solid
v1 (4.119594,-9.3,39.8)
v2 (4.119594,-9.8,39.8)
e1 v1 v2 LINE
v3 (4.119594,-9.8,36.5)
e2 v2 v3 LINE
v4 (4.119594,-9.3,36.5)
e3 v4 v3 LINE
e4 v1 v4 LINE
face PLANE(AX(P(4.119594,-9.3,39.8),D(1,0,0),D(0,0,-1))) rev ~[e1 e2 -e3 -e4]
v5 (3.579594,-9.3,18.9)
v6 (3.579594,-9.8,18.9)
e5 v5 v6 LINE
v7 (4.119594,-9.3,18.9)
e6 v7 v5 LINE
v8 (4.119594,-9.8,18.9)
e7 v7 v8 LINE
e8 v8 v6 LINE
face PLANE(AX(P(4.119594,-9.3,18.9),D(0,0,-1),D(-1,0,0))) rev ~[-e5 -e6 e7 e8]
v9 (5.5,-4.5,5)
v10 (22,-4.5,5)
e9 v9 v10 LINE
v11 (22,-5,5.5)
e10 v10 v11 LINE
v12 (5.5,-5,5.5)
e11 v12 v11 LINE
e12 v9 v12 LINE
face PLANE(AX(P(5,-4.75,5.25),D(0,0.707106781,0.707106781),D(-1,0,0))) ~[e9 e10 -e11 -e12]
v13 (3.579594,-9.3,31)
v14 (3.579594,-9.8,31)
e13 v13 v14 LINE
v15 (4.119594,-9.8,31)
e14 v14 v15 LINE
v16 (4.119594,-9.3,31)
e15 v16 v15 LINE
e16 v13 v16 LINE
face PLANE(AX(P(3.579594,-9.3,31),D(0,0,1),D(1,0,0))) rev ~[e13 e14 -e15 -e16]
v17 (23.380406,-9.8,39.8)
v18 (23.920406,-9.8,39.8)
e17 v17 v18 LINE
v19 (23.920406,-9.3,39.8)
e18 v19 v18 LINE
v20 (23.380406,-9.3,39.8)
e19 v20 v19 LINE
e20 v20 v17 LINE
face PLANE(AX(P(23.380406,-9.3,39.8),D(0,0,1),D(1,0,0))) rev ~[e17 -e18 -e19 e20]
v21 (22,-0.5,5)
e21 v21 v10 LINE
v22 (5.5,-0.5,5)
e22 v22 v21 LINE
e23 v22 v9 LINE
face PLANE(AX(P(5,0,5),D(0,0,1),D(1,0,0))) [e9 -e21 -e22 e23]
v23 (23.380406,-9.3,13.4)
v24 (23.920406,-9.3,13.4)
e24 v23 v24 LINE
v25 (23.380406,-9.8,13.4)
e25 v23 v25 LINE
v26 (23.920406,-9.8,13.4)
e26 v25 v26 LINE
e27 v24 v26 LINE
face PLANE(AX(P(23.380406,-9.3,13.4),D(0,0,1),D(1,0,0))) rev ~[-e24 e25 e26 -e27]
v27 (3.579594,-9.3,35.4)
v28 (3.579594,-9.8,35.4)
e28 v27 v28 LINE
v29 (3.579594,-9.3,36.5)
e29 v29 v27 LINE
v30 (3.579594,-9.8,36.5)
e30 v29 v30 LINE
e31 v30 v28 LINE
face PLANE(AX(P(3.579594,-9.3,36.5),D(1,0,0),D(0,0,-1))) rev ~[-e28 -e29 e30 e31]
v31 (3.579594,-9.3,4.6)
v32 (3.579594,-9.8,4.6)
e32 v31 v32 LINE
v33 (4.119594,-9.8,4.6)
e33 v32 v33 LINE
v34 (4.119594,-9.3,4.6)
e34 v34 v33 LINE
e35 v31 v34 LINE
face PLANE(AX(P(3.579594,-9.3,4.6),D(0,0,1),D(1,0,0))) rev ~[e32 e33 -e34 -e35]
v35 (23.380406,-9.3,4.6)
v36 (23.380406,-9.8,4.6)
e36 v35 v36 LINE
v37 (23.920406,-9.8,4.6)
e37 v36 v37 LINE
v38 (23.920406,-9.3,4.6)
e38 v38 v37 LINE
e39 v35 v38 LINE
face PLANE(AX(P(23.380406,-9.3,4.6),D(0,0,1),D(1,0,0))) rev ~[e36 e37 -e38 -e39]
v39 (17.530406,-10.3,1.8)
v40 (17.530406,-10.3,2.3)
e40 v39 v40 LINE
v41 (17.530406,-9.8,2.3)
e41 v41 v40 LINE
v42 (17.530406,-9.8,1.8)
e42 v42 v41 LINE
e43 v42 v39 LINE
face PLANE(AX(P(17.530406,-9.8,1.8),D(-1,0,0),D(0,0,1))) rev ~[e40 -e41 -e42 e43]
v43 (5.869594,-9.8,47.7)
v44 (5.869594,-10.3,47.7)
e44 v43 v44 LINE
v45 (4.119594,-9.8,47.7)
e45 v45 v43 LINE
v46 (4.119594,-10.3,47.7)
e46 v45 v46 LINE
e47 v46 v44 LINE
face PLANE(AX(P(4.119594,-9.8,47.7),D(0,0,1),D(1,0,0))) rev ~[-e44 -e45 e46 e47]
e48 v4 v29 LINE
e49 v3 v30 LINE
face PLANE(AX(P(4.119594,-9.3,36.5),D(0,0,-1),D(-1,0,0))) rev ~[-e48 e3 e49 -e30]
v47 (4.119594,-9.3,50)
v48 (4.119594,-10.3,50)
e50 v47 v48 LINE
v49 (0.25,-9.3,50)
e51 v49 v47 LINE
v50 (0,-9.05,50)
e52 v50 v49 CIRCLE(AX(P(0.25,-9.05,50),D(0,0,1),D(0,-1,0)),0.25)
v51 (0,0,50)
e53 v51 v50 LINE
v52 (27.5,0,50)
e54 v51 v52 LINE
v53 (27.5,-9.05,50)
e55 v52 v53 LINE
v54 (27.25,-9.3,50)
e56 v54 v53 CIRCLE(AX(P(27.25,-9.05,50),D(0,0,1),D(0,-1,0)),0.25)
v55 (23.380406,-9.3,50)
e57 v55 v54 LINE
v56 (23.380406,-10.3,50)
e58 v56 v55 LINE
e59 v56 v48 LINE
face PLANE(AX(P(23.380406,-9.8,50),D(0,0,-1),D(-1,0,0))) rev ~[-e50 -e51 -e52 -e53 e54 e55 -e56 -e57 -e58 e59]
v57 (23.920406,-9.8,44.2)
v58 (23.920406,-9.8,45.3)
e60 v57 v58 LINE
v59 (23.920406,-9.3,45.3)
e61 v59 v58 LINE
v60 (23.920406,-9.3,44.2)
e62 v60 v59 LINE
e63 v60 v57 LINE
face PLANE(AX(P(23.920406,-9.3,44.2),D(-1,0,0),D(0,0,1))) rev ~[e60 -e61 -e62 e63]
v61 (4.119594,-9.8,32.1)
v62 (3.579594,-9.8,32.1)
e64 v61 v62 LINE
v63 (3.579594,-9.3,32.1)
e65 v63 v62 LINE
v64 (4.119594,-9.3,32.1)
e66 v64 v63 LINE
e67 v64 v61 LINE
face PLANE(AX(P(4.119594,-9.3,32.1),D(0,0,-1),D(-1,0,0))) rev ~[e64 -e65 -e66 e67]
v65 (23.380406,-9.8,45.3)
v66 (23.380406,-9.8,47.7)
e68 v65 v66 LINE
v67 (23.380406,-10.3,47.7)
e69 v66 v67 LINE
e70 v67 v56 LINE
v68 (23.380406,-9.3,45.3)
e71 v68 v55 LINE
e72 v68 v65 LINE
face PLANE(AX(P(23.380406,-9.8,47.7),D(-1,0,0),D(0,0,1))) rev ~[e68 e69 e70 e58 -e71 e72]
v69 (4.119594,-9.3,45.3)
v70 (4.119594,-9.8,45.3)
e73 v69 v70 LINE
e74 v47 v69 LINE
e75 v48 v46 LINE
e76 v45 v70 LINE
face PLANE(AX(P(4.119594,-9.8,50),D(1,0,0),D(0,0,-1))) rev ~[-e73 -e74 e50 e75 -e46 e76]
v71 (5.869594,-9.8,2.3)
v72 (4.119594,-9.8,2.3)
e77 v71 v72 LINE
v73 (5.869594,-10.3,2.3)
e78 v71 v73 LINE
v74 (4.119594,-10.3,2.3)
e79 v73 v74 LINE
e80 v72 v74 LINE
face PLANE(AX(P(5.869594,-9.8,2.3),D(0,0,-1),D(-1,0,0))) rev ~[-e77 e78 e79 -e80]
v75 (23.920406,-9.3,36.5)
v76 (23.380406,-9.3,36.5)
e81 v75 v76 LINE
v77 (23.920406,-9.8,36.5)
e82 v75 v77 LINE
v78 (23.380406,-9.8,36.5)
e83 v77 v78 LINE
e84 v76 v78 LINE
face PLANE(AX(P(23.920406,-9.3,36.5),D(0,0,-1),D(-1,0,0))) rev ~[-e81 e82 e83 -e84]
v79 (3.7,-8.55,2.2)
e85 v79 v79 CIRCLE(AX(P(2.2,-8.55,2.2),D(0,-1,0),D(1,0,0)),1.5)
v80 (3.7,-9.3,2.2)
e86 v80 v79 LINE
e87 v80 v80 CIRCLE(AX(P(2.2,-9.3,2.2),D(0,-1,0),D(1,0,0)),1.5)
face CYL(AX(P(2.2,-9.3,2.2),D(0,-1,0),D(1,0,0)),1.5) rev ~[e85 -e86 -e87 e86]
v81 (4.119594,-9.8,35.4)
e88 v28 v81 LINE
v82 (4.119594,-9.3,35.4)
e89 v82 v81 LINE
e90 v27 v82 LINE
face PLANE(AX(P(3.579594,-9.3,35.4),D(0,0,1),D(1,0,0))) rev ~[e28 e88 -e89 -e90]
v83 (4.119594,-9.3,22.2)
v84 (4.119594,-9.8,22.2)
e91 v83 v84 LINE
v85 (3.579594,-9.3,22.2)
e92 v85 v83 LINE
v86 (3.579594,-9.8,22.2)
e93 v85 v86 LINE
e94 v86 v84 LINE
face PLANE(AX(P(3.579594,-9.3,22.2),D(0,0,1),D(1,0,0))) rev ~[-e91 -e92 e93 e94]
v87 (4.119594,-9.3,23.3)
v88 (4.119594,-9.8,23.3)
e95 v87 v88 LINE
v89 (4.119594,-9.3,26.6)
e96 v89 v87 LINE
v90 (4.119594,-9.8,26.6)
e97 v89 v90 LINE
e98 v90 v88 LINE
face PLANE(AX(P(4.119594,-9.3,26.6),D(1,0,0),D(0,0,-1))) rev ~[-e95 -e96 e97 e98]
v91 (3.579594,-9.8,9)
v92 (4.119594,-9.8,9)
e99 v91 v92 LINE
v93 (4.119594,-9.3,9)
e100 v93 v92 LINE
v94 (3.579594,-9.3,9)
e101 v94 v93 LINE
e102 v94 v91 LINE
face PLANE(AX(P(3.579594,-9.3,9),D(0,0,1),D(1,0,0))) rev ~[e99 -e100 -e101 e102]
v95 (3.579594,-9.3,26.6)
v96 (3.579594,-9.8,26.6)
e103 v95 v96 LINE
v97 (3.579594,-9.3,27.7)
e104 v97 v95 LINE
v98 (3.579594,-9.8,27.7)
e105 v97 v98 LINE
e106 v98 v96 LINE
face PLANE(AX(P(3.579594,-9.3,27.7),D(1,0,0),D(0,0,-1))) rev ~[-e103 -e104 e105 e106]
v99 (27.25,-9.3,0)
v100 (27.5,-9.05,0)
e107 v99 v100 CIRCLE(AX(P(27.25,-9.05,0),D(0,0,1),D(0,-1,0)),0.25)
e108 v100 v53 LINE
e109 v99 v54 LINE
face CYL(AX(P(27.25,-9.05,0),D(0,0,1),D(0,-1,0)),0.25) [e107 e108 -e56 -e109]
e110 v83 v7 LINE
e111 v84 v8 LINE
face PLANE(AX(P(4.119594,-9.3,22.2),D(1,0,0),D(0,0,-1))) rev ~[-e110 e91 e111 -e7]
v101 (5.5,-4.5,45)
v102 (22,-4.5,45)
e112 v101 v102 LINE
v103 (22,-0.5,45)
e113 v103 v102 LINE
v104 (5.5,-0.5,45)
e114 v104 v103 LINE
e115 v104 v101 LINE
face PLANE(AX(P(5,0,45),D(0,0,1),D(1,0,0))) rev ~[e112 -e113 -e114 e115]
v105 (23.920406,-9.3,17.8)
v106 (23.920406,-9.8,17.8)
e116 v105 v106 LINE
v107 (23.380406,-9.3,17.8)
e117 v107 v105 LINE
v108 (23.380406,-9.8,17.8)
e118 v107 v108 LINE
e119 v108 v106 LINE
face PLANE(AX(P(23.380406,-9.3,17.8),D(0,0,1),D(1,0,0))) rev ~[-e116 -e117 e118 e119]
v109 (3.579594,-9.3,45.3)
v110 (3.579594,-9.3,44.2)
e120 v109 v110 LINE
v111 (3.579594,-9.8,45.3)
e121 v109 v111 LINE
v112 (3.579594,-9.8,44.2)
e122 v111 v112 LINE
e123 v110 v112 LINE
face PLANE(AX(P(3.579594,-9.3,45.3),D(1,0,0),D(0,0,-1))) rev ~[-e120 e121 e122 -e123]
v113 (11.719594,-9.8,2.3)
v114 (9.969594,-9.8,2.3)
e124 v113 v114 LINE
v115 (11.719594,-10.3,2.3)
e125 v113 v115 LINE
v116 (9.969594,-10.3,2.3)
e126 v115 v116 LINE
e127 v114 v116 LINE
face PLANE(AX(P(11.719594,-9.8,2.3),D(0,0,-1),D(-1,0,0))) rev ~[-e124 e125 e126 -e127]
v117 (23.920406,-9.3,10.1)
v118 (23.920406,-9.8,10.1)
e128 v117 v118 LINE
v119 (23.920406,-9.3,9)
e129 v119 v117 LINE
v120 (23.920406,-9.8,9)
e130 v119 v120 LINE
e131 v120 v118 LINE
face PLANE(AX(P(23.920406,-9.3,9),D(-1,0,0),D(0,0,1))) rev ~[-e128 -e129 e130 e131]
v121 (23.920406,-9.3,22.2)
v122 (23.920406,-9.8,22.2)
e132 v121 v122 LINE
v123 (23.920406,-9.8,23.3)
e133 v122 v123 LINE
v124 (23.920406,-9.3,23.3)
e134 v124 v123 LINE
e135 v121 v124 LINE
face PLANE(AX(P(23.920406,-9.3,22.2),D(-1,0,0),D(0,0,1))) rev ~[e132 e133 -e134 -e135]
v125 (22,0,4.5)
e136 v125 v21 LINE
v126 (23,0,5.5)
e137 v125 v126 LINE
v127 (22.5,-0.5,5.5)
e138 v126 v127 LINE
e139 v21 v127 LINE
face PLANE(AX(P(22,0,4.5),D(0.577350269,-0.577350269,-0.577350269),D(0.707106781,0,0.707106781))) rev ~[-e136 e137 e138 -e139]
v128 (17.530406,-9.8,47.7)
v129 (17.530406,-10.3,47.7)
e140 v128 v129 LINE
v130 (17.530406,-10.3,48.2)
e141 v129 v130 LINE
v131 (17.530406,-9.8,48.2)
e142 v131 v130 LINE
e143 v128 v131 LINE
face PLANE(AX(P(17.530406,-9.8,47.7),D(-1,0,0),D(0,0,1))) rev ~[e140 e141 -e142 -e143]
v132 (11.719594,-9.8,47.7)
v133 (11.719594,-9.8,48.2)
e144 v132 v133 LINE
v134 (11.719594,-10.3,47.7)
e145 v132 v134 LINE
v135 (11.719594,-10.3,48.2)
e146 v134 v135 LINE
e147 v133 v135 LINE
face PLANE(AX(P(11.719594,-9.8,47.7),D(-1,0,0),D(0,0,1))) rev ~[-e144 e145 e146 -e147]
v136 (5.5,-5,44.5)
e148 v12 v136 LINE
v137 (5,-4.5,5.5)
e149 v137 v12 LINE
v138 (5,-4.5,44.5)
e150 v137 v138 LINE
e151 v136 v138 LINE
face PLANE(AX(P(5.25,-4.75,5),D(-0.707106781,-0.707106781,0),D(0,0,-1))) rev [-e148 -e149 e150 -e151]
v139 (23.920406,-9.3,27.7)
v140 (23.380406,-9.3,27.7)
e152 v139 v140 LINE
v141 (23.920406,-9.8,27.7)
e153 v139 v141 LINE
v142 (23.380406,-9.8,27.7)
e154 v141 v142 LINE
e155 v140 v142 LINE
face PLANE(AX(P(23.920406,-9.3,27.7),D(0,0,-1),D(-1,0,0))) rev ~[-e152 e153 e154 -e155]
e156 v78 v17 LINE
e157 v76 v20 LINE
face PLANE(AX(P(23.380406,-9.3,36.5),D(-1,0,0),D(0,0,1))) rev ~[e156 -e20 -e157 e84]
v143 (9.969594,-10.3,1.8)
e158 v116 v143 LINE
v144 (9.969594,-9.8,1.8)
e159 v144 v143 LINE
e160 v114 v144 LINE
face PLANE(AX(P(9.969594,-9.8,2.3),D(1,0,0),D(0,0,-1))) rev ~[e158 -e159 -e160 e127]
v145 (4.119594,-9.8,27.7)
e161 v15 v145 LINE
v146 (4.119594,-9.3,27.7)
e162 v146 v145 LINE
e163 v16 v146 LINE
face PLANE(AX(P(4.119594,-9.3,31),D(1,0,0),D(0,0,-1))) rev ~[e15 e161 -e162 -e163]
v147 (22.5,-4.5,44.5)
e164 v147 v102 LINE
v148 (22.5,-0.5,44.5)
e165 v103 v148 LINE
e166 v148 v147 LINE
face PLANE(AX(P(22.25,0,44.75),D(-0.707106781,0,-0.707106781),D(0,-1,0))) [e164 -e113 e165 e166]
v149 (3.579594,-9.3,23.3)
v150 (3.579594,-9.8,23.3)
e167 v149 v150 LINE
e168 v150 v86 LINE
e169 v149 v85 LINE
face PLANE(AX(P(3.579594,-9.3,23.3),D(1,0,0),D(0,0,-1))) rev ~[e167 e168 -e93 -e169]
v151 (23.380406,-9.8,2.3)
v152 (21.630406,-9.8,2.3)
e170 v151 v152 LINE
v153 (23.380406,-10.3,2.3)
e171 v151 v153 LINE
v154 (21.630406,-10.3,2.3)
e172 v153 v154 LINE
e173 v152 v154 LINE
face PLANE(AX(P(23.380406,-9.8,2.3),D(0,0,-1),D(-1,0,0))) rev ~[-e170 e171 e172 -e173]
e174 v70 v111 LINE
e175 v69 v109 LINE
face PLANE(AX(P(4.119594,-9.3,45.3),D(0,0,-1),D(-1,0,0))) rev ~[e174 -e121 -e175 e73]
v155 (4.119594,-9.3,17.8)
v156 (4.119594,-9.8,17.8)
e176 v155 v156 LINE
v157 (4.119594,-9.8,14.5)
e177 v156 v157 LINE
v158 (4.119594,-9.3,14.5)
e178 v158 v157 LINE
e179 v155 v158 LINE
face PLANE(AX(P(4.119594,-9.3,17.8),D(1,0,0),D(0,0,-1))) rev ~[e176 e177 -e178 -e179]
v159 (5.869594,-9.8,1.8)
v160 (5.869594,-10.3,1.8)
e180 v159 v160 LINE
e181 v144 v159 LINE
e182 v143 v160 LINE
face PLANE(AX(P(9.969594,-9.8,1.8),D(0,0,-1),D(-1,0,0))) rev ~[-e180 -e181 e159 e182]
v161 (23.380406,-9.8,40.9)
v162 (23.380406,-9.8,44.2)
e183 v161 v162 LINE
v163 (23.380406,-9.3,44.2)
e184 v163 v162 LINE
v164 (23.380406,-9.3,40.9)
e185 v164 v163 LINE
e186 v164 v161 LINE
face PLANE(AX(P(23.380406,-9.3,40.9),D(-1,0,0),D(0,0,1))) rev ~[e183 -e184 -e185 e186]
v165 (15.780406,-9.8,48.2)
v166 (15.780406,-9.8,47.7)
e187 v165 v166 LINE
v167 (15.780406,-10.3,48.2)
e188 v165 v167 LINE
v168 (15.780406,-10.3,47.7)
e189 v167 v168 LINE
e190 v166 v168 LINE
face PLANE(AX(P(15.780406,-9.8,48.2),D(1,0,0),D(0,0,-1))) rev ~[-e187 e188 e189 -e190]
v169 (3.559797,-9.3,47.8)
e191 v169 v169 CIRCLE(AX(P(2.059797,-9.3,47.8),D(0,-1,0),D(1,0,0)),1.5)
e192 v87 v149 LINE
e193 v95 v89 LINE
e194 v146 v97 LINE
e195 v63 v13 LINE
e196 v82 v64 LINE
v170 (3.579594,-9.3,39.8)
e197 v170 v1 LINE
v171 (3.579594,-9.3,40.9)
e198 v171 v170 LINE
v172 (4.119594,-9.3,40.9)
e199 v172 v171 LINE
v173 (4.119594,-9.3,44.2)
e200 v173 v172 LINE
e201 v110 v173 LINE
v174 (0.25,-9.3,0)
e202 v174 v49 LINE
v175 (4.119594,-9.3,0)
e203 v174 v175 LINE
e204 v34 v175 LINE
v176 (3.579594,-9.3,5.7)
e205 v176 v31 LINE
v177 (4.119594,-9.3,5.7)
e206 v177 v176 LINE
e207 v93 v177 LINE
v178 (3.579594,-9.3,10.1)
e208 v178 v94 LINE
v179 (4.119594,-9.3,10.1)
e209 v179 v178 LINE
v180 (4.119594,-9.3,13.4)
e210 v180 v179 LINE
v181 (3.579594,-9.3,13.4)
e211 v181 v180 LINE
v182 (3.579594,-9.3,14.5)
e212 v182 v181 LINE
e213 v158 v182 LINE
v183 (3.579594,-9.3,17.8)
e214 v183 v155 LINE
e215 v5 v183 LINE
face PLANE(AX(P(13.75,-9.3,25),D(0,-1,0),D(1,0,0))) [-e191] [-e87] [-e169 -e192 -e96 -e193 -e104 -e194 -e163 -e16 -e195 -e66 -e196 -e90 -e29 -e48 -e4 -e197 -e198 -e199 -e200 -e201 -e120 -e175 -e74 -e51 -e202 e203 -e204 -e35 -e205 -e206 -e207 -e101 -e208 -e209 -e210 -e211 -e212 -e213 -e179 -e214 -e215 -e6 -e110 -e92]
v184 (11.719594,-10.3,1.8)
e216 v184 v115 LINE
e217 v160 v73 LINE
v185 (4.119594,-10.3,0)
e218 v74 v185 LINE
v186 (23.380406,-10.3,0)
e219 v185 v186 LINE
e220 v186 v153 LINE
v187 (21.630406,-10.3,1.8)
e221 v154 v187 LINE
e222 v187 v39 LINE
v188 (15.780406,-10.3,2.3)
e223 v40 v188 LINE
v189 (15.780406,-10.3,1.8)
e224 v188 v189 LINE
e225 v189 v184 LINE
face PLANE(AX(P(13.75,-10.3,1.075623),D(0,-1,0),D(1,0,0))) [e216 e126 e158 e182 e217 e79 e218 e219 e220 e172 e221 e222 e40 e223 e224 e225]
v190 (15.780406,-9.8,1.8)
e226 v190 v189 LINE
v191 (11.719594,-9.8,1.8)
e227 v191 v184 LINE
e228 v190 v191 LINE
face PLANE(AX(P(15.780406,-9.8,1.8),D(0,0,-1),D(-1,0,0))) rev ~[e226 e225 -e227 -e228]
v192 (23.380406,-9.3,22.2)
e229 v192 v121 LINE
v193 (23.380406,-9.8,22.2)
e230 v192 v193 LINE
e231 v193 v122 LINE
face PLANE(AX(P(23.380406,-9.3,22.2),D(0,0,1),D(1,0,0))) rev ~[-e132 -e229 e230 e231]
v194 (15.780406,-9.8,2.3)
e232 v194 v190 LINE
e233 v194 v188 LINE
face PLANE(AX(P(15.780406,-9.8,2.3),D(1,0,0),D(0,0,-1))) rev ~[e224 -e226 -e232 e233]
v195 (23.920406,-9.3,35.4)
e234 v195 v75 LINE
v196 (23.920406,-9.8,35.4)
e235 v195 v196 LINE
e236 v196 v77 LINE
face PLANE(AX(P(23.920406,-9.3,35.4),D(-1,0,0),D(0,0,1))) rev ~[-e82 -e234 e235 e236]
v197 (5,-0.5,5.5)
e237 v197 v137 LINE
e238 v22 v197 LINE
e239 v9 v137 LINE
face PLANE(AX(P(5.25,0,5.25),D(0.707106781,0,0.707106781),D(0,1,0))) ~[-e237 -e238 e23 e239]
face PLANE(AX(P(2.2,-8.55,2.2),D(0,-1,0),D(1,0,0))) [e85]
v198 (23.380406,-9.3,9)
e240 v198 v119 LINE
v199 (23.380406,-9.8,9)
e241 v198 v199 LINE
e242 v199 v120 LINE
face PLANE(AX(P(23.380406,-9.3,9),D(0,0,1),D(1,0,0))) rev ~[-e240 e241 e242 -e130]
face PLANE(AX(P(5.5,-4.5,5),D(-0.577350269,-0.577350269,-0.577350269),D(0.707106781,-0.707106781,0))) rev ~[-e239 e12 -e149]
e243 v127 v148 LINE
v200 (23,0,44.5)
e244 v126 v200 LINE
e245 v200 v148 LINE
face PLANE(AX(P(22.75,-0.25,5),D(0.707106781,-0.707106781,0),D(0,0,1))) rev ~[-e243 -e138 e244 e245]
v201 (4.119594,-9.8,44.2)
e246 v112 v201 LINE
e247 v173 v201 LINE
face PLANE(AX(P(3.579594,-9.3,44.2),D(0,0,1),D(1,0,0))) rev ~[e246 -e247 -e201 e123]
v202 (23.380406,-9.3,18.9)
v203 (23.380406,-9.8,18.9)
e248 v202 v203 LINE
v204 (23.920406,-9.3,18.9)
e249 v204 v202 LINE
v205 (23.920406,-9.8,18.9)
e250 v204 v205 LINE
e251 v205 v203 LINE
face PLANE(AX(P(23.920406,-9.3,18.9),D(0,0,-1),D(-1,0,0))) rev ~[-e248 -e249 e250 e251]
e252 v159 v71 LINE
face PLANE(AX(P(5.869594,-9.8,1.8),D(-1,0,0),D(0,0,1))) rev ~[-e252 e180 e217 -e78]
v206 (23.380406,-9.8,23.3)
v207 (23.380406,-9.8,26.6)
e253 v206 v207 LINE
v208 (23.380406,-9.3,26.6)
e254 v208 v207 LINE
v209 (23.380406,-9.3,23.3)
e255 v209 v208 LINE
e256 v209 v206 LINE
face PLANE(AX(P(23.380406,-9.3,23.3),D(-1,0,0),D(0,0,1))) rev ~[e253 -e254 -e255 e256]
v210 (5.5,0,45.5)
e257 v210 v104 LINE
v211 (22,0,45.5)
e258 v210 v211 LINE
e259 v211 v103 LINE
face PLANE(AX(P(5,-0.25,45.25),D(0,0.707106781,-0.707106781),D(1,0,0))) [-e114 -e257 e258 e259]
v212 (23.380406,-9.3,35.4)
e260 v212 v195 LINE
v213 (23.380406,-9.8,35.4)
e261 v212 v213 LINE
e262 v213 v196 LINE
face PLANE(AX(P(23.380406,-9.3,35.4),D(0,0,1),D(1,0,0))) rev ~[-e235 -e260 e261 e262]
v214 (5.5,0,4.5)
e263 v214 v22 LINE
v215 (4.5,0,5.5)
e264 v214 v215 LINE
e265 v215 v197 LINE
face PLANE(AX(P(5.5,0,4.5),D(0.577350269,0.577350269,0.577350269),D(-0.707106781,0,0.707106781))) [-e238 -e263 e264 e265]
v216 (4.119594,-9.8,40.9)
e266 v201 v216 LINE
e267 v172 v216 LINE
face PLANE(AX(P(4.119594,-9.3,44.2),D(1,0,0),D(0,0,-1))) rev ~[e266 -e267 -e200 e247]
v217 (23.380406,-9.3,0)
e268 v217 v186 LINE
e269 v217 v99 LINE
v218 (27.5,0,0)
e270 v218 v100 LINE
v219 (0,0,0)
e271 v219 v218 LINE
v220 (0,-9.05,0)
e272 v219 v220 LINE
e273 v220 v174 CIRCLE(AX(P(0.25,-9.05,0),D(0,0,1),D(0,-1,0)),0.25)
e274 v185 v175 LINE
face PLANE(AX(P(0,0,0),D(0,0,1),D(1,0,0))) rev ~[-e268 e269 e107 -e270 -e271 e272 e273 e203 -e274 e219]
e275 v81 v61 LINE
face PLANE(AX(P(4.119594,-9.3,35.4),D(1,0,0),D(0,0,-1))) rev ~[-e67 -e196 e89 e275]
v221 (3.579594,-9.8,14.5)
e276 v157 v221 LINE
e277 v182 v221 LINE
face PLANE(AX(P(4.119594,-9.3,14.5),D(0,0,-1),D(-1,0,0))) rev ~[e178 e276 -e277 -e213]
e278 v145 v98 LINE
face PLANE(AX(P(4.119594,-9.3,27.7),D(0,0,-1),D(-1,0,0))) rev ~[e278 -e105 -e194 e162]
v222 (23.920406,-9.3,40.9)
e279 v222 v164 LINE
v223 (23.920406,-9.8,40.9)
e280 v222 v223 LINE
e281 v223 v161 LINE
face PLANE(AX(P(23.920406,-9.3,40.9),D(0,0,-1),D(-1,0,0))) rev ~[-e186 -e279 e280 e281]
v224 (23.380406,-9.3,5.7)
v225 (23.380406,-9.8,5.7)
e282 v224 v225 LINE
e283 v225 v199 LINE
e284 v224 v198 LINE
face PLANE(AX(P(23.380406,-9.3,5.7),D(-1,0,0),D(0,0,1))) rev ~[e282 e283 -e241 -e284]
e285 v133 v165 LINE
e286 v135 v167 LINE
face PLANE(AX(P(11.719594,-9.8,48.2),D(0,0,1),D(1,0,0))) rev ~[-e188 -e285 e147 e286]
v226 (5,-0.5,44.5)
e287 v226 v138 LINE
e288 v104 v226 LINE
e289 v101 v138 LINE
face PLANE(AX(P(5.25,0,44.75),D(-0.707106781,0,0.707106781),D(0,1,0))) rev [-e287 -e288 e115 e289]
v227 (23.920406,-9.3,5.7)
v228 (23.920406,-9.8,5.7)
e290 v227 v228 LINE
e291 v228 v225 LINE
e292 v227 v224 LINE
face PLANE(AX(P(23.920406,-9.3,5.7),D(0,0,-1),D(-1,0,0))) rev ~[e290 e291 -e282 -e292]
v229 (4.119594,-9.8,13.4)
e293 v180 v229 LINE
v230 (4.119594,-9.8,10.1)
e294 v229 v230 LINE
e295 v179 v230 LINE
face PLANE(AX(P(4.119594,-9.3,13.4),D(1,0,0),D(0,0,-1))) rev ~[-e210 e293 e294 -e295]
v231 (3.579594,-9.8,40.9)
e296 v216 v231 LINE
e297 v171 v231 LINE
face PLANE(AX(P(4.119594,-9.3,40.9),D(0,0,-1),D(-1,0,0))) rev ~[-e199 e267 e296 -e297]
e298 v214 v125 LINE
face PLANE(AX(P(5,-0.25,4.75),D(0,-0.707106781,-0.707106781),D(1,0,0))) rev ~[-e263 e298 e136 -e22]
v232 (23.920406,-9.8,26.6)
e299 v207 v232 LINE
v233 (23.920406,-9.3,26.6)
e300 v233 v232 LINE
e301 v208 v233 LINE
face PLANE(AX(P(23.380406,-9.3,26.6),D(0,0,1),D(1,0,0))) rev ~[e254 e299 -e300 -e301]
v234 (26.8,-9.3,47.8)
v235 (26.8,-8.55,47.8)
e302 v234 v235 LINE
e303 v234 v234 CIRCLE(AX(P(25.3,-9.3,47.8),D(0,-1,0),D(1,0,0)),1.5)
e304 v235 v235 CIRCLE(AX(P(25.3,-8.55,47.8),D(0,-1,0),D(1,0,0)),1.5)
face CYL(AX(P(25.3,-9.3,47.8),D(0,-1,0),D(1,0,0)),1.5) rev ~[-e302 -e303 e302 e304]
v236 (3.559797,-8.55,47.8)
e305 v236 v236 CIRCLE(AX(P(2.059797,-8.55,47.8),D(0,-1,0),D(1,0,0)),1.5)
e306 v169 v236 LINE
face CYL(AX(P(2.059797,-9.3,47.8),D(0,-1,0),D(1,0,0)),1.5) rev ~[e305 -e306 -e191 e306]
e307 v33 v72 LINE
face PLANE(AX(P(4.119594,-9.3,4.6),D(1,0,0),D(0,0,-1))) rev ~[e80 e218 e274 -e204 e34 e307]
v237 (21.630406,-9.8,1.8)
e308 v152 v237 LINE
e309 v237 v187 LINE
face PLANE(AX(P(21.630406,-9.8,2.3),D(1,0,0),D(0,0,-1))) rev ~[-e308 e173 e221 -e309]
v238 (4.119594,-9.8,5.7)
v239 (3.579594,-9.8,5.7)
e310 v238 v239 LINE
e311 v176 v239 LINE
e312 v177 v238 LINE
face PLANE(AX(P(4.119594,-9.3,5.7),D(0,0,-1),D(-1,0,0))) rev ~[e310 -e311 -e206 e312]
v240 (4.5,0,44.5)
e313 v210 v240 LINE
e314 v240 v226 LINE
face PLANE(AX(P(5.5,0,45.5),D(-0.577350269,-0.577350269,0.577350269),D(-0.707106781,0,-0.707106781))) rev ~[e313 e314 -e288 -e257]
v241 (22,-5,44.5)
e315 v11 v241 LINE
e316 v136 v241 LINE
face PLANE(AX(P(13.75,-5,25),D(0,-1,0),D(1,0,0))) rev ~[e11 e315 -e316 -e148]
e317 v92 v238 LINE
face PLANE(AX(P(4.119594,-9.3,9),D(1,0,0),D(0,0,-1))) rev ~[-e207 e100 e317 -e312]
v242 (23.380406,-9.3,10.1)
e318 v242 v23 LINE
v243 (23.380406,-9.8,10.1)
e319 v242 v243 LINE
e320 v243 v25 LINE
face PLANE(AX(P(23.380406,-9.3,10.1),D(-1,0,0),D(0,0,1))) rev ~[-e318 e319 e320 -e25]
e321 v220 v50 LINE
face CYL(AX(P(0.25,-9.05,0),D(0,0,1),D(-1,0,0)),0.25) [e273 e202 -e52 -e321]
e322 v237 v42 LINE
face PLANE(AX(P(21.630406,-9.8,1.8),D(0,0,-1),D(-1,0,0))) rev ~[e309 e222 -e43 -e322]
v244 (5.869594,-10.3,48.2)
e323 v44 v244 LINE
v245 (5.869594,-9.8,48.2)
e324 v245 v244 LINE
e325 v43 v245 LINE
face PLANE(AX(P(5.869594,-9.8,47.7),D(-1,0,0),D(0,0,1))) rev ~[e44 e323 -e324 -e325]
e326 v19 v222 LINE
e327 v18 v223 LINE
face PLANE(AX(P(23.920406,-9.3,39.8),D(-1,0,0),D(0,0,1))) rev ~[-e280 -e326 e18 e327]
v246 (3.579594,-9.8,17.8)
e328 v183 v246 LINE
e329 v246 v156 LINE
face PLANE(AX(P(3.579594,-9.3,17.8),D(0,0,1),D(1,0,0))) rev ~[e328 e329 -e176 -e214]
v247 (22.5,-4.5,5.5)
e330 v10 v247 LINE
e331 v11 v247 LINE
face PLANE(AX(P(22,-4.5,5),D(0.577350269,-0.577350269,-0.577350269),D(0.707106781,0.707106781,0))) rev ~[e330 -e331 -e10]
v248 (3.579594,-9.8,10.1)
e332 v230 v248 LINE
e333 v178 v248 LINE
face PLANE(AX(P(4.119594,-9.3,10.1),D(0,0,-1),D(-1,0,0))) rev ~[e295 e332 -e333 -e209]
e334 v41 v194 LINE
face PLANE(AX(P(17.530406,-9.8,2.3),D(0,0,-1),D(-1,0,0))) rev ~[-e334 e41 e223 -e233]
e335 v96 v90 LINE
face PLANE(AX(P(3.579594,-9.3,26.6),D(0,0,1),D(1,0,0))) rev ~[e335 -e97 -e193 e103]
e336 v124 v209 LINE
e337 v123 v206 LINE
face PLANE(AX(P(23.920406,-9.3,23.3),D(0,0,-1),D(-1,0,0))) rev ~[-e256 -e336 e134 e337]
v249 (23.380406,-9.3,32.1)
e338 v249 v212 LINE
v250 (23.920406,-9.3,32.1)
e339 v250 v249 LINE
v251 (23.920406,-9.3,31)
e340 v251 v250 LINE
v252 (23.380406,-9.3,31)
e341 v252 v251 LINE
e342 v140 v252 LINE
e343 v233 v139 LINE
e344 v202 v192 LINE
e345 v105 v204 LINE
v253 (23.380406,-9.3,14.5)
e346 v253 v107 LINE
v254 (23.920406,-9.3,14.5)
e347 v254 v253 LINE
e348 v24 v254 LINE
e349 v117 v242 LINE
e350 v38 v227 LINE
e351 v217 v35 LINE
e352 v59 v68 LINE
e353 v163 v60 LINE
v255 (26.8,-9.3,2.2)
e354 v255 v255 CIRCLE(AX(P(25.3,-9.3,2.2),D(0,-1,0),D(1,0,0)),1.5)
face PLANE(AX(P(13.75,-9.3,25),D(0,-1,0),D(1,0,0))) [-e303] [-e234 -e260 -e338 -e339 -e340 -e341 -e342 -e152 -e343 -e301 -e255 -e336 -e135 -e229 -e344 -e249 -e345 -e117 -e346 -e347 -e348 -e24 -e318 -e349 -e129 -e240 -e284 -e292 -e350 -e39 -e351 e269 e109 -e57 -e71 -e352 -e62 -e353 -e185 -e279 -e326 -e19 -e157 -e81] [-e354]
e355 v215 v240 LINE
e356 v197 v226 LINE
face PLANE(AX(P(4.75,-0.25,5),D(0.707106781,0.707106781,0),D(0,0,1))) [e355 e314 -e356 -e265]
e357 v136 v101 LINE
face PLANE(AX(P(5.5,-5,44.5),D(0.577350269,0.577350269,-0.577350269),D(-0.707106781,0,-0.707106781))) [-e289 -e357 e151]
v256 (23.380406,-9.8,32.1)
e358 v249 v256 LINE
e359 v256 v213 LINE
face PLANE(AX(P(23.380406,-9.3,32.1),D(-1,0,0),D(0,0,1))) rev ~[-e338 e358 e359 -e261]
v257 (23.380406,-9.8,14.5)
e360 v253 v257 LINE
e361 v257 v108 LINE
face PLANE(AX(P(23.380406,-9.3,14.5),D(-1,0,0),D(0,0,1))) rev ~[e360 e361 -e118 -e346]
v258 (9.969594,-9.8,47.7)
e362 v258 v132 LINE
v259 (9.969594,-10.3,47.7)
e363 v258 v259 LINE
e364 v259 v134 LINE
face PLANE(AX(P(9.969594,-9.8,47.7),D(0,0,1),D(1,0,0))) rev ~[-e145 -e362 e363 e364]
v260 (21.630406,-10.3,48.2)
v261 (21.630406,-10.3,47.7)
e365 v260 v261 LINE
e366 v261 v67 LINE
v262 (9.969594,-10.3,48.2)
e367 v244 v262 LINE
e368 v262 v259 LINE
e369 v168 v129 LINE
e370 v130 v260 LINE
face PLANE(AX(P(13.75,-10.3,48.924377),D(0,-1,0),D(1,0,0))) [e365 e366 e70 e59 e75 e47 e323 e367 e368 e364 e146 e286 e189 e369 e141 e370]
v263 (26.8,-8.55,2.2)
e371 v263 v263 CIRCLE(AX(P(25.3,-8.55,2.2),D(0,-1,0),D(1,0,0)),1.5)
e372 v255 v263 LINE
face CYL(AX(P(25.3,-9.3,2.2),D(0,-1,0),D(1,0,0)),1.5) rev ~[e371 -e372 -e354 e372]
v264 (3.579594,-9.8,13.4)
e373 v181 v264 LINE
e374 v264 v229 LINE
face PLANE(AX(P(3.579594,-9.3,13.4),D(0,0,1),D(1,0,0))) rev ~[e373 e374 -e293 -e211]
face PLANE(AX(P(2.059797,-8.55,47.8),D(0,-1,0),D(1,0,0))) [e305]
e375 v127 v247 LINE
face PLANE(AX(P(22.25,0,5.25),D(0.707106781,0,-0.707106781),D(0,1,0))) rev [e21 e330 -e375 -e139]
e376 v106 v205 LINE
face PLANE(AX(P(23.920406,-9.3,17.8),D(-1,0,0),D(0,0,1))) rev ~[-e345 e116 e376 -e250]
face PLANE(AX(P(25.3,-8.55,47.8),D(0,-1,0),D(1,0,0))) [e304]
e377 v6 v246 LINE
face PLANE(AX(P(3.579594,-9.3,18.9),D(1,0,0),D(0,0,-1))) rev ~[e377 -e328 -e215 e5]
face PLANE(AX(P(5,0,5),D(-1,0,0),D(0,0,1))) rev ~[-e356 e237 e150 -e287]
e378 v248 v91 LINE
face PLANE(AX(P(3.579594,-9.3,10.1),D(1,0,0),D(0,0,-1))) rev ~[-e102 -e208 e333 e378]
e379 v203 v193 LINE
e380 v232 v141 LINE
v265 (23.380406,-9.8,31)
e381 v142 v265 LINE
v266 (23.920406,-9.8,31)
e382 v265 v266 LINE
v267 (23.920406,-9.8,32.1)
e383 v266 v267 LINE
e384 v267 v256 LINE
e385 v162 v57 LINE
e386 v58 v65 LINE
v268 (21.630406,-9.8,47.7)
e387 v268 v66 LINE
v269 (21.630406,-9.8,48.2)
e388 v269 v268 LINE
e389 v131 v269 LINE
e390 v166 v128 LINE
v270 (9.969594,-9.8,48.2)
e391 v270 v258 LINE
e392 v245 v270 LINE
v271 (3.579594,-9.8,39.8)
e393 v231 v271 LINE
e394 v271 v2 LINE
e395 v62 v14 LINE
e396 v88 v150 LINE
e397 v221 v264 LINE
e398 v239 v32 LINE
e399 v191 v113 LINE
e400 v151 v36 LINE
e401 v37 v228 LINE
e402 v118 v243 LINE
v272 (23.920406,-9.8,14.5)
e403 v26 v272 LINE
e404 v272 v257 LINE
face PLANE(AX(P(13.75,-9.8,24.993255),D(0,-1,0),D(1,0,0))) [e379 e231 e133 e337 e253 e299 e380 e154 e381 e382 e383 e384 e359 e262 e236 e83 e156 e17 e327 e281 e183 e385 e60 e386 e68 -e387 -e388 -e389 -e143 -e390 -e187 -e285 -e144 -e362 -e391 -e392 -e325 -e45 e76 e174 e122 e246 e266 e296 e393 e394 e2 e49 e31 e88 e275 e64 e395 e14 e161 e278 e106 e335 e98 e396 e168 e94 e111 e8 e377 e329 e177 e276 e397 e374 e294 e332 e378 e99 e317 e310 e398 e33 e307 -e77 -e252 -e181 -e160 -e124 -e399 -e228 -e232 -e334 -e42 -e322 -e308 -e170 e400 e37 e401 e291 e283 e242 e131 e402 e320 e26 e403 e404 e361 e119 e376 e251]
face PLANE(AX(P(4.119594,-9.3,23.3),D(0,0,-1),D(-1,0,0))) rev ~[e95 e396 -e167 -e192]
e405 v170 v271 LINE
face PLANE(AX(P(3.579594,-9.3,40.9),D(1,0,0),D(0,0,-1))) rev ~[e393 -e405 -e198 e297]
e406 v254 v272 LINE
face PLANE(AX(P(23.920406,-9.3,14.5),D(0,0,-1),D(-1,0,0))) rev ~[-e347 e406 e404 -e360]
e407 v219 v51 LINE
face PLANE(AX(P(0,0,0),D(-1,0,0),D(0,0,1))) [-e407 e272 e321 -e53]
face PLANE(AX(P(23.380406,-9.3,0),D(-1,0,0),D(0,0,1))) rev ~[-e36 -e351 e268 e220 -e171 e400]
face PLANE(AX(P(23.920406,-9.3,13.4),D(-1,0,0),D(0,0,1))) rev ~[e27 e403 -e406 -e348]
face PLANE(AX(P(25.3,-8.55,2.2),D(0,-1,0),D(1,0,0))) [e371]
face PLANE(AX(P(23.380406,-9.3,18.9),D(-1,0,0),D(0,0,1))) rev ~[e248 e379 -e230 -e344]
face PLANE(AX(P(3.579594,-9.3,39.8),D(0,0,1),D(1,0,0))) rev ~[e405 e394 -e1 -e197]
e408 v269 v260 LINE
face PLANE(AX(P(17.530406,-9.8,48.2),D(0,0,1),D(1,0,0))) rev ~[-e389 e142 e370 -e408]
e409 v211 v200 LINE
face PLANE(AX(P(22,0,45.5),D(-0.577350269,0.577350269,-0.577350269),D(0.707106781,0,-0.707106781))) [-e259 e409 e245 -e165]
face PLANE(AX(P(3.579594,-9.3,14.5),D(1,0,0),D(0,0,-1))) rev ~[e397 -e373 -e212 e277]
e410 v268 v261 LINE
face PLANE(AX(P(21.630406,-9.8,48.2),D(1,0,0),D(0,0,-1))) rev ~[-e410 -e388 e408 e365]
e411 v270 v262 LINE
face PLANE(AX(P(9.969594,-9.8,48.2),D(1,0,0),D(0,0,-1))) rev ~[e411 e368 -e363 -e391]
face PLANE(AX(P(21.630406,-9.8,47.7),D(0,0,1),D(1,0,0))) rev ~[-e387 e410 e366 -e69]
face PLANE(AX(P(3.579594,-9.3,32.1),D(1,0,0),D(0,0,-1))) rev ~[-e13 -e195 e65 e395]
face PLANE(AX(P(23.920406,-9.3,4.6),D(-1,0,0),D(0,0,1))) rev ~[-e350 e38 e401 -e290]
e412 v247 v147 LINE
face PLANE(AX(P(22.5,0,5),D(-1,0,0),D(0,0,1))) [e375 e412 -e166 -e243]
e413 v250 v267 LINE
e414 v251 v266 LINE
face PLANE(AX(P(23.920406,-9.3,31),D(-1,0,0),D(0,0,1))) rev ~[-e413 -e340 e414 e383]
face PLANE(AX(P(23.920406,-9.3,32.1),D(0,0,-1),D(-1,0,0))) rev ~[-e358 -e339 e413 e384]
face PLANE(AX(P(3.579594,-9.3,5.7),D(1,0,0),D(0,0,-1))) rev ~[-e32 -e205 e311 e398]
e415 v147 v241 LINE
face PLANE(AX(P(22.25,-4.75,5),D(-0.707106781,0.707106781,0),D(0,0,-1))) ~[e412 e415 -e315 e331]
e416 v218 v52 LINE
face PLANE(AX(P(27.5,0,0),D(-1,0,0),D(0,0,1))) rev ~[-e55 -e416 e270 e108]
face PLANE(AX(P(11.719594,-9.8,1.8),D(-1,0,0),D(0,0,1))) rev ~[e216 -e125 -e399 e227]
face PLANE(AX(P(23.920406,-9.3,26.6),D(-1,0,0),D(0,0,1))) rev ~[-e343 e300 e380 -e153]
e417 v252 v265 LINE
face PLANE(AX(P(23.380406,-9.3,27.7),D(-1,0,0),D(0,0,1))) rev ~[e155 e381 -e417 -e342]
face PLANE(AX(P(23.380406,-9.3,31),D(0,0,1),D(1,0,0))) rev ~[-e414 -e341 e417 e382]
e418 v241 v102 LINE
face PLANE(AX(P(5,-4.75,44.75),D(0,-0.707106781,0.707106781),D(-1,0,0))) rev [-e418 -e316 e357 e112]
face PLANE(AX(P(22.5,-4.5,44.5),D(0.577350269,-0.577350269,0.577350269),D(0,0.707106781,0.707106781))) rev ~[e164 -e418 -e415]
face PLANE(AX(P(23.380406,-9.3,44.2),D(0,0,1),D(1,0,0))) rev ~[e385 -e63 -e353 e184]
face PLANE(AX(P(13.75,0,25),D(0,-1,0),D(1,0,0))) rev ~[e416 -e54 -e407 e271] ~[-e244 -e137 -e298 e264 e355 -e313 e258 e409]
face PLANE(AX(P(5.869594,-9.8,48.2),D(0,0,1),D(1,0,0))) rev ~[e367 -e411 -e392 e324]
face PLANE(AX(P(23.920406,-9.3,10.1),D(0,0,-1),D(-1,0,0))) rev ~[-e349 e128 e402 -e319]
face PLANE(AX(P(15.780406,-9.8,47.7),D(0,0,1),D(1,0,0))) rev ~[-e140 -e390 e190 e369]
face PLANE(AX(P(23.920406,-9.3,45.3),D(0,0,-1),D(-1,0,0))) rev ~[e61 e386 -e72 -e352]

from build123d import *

# Parameters (mm, degrees)
F0_W      = 27.5
F0_H      = 50
F1_DEPTH  = 9.3
F3_DEPTH  = 0.5
F4_R      = 1.5
F5_DEPTH  = 0.75
F6_R      = 0.25
F8_DEPTH  = 0.5
F9_W      = 17.5
F9_H      = 40
F10_DEPTH = 5
F11_SIZE  = 0.5


with BuildPart() as f1:
    # F0 (on Front) → F1 (new body)
    with BuildSketch(Plane.XZ):
        with Locations((13.75, 25)):
            Rectangle(F0_W, F0_H)
    extrude(amount=F1_DEPTH)

    # F2 (on face) → F3 (join)
    with BuildSketch(Plane.XZ.offset(9.3)):
        Polygon((13.75, 50), (4.1195944277, 50), (4.1195944277, 45.3), (3.5795944277, 45.3), (3.5795944277, 44.2), (4.1195944277, 44.2), (4.1195944277, 40.9), (3.5795944277, 40.9), (3.5795944277, 39.8), (4.1195944277, 39.8), (4.1195944277, 36.5), (3.5795944277, 36.5), (3.5795944277, 35.4), (4.1195944277, 35.4), (4.1195944277, 32.1), (3.5795944277, 32.1), (3.5795944277, 31), (4.1195944277, 31), (4.1195944277, 27.7), (3.5795944277, 27.7), (3.5795944277, 26.6), (4.1195944277, 26.6), (4.1195944277, 23.3), (3.5795944277, 23.3), (3.5795944277, 22.2), (4.1195944277, 22.2), (4.1195944277, 18.9), (3.5795944277, 18.9), (3.5795944277, 17.8), (4.1195944277, 17.8), (4.1195944277, 14.5), (3.5795944277, 14.5), (3.5795944277, 13.4), (4.1195944277, 13.4), (4.1195944277, 10.1), (3.5795944277, 10.1), (3.5795944277, 9), (4.1195944277, 9), (4.1195944277, 5.7), (3.5795944277, 5.7), (3.5795944277, 4.6), (4.1195944277, 4.6), (4.1195944277, 0), (13.75, 0), (23.3804055723, 0), (23.3804055723, 4.6), (23.9204055723, 4.6), (23.9204055723, 5.7), (23.3804055723, 5.7), (23.3804055723, 9), (23.9204055723, 9), (23.9204055723, 10.1), (23.3804055723, 10.1), (23.3804055723, 13.4), (23.9204055723, 13.4), (23.9204055723, 14.5), (23.3804055723, 14.5), (23.3804055723, 17.8), (23.9204055723, 17.8), (23.9204055723, 18.9), (23.3804055723, 18.9), (23.3804055723, 22.2), (23.9204055723, 22.2), (23.9204055723, 23.3), (23.3804055723, 23.3), (23.3804055723, 26.6), (23.9204055723, 26.6), (23.9204055723, 27.7), (23.3804055723, 27.7), (23.3804055723, 31), (23.9204055723, 31), (23.9204055723, 32.1), (23.3804055723, 32.1), (23.3804055723, 35.4), (23.9204055723, 35.4), (23.9204055723, 36.5), (23.3804055723, 36.5), (23.3804055723, 39.8), (23.9204055723, 39.8), (23.9204055723, 40.9), (23.3804055723, 40.9), (23.3804055723, 44.2), (23.9204055723, 44.2), (23.9204055723, 45.3), (23.3804055723, 45.3), (23.3804055723, 50), align=None)
    extrude(amount=F3_DEPTH)

    # F4 (on face) → F5 (cut)
    with BuildSketch(Plane.XZ.offset(9.3)):
        with Locations((2.2, 2.2)):
            Circle(F4_R)
        with Locations((25.3, 2.2)):
            Circle(F4_R)
        with Locations((2.0597972139, 47.8)):
            Circle(F4_R)
        with Locations((25.3, 47.8)):
            Circle(F4_R)
    extrude(amount=-F5_DEPTH, mode=Mode.SUBTRACT)

    # F6
    f6_edges = [f1.edges().sort_by_distance(p)[0] for p in [
        (0, -9.3, 25),
        (27.5, -9.3, 25),
    ]]
    fillet(f6_edges, radius=F6_R)

    # F7 (on face) → F8 (join)
    with BuildSketch(Plane.XZ.offset(9.8)):
        Polygon((23.3804055723, 50), (4.1195944277, 50), (4.1195944277, 48.2), (4.1195944277, 47.7), (5.8695944277, 47.7), (5.8695944277, 48.2), (9.9695944277, 48.2), (9.9695944277, 47.7), (11.7195944277, 47.7), (11.7195944277, 48.2), (15.7804055723, 48.2), (15.7804055723, 47.7), (17.5304055723, 47.7), (17.5304055723, 48.2), (21.6304055723, 48.2), (21.6304055723, 47.7), (23.3804055723, 47.7), (23.3804055723, 48.2), align=None)
        Polygon((23.3804055723, 2.3), (21.6304055723, 2.3), (21.6304055723, 1.8), (17.5304055723, 1.8), (17.5304055723, 2.3), (15.7804055723, 2.3), (15.7804055723, 1.8), (11.7195944277, 1.8), (11.7195944277, 2.3), (9.9695944277, 2.3), (9.9695944277, 1.8), (5.8695944277, 1.8), (5.8695944277, 2.3), (4.1195944277, 2.3), (4.1195944277, 1.8), (4.1195944277, 0), (23.3804055723, 0), (23.3804055723, 1.8), align=None)
    extrude(amount=F8_DEPTH)

    # F9 (on face) → F10 (cut)
    with BuildSketch(Plane.XZ):
        with Locations((13.75, 25)):
            Rectangle(F9_W, F9_H)
    extrude(amount=F10_DEPTH, mode=Mode.SUBTRACT)

    # F11
    f11_edges = [f1.edges().sort_by_distance(p)[0] for p in [
        (5, -2.5, 45),
        (13.75, -5, 45),
        (5, -5, 25),
        (22.5, -5, 25),
        (5, -2.5, 5),
        (13.75, -5, 5),
        (22.5, -2.5, 5),
        (13.75, 0, 5),
        (22.5, -2.5, 45),
        (13.75, 0, 45),
        (5, 0, 25),
        (22.5, 0, 25),
    ]]
    chamfer(f11_edges, length=F11_SIZE)


solid = f1.part
